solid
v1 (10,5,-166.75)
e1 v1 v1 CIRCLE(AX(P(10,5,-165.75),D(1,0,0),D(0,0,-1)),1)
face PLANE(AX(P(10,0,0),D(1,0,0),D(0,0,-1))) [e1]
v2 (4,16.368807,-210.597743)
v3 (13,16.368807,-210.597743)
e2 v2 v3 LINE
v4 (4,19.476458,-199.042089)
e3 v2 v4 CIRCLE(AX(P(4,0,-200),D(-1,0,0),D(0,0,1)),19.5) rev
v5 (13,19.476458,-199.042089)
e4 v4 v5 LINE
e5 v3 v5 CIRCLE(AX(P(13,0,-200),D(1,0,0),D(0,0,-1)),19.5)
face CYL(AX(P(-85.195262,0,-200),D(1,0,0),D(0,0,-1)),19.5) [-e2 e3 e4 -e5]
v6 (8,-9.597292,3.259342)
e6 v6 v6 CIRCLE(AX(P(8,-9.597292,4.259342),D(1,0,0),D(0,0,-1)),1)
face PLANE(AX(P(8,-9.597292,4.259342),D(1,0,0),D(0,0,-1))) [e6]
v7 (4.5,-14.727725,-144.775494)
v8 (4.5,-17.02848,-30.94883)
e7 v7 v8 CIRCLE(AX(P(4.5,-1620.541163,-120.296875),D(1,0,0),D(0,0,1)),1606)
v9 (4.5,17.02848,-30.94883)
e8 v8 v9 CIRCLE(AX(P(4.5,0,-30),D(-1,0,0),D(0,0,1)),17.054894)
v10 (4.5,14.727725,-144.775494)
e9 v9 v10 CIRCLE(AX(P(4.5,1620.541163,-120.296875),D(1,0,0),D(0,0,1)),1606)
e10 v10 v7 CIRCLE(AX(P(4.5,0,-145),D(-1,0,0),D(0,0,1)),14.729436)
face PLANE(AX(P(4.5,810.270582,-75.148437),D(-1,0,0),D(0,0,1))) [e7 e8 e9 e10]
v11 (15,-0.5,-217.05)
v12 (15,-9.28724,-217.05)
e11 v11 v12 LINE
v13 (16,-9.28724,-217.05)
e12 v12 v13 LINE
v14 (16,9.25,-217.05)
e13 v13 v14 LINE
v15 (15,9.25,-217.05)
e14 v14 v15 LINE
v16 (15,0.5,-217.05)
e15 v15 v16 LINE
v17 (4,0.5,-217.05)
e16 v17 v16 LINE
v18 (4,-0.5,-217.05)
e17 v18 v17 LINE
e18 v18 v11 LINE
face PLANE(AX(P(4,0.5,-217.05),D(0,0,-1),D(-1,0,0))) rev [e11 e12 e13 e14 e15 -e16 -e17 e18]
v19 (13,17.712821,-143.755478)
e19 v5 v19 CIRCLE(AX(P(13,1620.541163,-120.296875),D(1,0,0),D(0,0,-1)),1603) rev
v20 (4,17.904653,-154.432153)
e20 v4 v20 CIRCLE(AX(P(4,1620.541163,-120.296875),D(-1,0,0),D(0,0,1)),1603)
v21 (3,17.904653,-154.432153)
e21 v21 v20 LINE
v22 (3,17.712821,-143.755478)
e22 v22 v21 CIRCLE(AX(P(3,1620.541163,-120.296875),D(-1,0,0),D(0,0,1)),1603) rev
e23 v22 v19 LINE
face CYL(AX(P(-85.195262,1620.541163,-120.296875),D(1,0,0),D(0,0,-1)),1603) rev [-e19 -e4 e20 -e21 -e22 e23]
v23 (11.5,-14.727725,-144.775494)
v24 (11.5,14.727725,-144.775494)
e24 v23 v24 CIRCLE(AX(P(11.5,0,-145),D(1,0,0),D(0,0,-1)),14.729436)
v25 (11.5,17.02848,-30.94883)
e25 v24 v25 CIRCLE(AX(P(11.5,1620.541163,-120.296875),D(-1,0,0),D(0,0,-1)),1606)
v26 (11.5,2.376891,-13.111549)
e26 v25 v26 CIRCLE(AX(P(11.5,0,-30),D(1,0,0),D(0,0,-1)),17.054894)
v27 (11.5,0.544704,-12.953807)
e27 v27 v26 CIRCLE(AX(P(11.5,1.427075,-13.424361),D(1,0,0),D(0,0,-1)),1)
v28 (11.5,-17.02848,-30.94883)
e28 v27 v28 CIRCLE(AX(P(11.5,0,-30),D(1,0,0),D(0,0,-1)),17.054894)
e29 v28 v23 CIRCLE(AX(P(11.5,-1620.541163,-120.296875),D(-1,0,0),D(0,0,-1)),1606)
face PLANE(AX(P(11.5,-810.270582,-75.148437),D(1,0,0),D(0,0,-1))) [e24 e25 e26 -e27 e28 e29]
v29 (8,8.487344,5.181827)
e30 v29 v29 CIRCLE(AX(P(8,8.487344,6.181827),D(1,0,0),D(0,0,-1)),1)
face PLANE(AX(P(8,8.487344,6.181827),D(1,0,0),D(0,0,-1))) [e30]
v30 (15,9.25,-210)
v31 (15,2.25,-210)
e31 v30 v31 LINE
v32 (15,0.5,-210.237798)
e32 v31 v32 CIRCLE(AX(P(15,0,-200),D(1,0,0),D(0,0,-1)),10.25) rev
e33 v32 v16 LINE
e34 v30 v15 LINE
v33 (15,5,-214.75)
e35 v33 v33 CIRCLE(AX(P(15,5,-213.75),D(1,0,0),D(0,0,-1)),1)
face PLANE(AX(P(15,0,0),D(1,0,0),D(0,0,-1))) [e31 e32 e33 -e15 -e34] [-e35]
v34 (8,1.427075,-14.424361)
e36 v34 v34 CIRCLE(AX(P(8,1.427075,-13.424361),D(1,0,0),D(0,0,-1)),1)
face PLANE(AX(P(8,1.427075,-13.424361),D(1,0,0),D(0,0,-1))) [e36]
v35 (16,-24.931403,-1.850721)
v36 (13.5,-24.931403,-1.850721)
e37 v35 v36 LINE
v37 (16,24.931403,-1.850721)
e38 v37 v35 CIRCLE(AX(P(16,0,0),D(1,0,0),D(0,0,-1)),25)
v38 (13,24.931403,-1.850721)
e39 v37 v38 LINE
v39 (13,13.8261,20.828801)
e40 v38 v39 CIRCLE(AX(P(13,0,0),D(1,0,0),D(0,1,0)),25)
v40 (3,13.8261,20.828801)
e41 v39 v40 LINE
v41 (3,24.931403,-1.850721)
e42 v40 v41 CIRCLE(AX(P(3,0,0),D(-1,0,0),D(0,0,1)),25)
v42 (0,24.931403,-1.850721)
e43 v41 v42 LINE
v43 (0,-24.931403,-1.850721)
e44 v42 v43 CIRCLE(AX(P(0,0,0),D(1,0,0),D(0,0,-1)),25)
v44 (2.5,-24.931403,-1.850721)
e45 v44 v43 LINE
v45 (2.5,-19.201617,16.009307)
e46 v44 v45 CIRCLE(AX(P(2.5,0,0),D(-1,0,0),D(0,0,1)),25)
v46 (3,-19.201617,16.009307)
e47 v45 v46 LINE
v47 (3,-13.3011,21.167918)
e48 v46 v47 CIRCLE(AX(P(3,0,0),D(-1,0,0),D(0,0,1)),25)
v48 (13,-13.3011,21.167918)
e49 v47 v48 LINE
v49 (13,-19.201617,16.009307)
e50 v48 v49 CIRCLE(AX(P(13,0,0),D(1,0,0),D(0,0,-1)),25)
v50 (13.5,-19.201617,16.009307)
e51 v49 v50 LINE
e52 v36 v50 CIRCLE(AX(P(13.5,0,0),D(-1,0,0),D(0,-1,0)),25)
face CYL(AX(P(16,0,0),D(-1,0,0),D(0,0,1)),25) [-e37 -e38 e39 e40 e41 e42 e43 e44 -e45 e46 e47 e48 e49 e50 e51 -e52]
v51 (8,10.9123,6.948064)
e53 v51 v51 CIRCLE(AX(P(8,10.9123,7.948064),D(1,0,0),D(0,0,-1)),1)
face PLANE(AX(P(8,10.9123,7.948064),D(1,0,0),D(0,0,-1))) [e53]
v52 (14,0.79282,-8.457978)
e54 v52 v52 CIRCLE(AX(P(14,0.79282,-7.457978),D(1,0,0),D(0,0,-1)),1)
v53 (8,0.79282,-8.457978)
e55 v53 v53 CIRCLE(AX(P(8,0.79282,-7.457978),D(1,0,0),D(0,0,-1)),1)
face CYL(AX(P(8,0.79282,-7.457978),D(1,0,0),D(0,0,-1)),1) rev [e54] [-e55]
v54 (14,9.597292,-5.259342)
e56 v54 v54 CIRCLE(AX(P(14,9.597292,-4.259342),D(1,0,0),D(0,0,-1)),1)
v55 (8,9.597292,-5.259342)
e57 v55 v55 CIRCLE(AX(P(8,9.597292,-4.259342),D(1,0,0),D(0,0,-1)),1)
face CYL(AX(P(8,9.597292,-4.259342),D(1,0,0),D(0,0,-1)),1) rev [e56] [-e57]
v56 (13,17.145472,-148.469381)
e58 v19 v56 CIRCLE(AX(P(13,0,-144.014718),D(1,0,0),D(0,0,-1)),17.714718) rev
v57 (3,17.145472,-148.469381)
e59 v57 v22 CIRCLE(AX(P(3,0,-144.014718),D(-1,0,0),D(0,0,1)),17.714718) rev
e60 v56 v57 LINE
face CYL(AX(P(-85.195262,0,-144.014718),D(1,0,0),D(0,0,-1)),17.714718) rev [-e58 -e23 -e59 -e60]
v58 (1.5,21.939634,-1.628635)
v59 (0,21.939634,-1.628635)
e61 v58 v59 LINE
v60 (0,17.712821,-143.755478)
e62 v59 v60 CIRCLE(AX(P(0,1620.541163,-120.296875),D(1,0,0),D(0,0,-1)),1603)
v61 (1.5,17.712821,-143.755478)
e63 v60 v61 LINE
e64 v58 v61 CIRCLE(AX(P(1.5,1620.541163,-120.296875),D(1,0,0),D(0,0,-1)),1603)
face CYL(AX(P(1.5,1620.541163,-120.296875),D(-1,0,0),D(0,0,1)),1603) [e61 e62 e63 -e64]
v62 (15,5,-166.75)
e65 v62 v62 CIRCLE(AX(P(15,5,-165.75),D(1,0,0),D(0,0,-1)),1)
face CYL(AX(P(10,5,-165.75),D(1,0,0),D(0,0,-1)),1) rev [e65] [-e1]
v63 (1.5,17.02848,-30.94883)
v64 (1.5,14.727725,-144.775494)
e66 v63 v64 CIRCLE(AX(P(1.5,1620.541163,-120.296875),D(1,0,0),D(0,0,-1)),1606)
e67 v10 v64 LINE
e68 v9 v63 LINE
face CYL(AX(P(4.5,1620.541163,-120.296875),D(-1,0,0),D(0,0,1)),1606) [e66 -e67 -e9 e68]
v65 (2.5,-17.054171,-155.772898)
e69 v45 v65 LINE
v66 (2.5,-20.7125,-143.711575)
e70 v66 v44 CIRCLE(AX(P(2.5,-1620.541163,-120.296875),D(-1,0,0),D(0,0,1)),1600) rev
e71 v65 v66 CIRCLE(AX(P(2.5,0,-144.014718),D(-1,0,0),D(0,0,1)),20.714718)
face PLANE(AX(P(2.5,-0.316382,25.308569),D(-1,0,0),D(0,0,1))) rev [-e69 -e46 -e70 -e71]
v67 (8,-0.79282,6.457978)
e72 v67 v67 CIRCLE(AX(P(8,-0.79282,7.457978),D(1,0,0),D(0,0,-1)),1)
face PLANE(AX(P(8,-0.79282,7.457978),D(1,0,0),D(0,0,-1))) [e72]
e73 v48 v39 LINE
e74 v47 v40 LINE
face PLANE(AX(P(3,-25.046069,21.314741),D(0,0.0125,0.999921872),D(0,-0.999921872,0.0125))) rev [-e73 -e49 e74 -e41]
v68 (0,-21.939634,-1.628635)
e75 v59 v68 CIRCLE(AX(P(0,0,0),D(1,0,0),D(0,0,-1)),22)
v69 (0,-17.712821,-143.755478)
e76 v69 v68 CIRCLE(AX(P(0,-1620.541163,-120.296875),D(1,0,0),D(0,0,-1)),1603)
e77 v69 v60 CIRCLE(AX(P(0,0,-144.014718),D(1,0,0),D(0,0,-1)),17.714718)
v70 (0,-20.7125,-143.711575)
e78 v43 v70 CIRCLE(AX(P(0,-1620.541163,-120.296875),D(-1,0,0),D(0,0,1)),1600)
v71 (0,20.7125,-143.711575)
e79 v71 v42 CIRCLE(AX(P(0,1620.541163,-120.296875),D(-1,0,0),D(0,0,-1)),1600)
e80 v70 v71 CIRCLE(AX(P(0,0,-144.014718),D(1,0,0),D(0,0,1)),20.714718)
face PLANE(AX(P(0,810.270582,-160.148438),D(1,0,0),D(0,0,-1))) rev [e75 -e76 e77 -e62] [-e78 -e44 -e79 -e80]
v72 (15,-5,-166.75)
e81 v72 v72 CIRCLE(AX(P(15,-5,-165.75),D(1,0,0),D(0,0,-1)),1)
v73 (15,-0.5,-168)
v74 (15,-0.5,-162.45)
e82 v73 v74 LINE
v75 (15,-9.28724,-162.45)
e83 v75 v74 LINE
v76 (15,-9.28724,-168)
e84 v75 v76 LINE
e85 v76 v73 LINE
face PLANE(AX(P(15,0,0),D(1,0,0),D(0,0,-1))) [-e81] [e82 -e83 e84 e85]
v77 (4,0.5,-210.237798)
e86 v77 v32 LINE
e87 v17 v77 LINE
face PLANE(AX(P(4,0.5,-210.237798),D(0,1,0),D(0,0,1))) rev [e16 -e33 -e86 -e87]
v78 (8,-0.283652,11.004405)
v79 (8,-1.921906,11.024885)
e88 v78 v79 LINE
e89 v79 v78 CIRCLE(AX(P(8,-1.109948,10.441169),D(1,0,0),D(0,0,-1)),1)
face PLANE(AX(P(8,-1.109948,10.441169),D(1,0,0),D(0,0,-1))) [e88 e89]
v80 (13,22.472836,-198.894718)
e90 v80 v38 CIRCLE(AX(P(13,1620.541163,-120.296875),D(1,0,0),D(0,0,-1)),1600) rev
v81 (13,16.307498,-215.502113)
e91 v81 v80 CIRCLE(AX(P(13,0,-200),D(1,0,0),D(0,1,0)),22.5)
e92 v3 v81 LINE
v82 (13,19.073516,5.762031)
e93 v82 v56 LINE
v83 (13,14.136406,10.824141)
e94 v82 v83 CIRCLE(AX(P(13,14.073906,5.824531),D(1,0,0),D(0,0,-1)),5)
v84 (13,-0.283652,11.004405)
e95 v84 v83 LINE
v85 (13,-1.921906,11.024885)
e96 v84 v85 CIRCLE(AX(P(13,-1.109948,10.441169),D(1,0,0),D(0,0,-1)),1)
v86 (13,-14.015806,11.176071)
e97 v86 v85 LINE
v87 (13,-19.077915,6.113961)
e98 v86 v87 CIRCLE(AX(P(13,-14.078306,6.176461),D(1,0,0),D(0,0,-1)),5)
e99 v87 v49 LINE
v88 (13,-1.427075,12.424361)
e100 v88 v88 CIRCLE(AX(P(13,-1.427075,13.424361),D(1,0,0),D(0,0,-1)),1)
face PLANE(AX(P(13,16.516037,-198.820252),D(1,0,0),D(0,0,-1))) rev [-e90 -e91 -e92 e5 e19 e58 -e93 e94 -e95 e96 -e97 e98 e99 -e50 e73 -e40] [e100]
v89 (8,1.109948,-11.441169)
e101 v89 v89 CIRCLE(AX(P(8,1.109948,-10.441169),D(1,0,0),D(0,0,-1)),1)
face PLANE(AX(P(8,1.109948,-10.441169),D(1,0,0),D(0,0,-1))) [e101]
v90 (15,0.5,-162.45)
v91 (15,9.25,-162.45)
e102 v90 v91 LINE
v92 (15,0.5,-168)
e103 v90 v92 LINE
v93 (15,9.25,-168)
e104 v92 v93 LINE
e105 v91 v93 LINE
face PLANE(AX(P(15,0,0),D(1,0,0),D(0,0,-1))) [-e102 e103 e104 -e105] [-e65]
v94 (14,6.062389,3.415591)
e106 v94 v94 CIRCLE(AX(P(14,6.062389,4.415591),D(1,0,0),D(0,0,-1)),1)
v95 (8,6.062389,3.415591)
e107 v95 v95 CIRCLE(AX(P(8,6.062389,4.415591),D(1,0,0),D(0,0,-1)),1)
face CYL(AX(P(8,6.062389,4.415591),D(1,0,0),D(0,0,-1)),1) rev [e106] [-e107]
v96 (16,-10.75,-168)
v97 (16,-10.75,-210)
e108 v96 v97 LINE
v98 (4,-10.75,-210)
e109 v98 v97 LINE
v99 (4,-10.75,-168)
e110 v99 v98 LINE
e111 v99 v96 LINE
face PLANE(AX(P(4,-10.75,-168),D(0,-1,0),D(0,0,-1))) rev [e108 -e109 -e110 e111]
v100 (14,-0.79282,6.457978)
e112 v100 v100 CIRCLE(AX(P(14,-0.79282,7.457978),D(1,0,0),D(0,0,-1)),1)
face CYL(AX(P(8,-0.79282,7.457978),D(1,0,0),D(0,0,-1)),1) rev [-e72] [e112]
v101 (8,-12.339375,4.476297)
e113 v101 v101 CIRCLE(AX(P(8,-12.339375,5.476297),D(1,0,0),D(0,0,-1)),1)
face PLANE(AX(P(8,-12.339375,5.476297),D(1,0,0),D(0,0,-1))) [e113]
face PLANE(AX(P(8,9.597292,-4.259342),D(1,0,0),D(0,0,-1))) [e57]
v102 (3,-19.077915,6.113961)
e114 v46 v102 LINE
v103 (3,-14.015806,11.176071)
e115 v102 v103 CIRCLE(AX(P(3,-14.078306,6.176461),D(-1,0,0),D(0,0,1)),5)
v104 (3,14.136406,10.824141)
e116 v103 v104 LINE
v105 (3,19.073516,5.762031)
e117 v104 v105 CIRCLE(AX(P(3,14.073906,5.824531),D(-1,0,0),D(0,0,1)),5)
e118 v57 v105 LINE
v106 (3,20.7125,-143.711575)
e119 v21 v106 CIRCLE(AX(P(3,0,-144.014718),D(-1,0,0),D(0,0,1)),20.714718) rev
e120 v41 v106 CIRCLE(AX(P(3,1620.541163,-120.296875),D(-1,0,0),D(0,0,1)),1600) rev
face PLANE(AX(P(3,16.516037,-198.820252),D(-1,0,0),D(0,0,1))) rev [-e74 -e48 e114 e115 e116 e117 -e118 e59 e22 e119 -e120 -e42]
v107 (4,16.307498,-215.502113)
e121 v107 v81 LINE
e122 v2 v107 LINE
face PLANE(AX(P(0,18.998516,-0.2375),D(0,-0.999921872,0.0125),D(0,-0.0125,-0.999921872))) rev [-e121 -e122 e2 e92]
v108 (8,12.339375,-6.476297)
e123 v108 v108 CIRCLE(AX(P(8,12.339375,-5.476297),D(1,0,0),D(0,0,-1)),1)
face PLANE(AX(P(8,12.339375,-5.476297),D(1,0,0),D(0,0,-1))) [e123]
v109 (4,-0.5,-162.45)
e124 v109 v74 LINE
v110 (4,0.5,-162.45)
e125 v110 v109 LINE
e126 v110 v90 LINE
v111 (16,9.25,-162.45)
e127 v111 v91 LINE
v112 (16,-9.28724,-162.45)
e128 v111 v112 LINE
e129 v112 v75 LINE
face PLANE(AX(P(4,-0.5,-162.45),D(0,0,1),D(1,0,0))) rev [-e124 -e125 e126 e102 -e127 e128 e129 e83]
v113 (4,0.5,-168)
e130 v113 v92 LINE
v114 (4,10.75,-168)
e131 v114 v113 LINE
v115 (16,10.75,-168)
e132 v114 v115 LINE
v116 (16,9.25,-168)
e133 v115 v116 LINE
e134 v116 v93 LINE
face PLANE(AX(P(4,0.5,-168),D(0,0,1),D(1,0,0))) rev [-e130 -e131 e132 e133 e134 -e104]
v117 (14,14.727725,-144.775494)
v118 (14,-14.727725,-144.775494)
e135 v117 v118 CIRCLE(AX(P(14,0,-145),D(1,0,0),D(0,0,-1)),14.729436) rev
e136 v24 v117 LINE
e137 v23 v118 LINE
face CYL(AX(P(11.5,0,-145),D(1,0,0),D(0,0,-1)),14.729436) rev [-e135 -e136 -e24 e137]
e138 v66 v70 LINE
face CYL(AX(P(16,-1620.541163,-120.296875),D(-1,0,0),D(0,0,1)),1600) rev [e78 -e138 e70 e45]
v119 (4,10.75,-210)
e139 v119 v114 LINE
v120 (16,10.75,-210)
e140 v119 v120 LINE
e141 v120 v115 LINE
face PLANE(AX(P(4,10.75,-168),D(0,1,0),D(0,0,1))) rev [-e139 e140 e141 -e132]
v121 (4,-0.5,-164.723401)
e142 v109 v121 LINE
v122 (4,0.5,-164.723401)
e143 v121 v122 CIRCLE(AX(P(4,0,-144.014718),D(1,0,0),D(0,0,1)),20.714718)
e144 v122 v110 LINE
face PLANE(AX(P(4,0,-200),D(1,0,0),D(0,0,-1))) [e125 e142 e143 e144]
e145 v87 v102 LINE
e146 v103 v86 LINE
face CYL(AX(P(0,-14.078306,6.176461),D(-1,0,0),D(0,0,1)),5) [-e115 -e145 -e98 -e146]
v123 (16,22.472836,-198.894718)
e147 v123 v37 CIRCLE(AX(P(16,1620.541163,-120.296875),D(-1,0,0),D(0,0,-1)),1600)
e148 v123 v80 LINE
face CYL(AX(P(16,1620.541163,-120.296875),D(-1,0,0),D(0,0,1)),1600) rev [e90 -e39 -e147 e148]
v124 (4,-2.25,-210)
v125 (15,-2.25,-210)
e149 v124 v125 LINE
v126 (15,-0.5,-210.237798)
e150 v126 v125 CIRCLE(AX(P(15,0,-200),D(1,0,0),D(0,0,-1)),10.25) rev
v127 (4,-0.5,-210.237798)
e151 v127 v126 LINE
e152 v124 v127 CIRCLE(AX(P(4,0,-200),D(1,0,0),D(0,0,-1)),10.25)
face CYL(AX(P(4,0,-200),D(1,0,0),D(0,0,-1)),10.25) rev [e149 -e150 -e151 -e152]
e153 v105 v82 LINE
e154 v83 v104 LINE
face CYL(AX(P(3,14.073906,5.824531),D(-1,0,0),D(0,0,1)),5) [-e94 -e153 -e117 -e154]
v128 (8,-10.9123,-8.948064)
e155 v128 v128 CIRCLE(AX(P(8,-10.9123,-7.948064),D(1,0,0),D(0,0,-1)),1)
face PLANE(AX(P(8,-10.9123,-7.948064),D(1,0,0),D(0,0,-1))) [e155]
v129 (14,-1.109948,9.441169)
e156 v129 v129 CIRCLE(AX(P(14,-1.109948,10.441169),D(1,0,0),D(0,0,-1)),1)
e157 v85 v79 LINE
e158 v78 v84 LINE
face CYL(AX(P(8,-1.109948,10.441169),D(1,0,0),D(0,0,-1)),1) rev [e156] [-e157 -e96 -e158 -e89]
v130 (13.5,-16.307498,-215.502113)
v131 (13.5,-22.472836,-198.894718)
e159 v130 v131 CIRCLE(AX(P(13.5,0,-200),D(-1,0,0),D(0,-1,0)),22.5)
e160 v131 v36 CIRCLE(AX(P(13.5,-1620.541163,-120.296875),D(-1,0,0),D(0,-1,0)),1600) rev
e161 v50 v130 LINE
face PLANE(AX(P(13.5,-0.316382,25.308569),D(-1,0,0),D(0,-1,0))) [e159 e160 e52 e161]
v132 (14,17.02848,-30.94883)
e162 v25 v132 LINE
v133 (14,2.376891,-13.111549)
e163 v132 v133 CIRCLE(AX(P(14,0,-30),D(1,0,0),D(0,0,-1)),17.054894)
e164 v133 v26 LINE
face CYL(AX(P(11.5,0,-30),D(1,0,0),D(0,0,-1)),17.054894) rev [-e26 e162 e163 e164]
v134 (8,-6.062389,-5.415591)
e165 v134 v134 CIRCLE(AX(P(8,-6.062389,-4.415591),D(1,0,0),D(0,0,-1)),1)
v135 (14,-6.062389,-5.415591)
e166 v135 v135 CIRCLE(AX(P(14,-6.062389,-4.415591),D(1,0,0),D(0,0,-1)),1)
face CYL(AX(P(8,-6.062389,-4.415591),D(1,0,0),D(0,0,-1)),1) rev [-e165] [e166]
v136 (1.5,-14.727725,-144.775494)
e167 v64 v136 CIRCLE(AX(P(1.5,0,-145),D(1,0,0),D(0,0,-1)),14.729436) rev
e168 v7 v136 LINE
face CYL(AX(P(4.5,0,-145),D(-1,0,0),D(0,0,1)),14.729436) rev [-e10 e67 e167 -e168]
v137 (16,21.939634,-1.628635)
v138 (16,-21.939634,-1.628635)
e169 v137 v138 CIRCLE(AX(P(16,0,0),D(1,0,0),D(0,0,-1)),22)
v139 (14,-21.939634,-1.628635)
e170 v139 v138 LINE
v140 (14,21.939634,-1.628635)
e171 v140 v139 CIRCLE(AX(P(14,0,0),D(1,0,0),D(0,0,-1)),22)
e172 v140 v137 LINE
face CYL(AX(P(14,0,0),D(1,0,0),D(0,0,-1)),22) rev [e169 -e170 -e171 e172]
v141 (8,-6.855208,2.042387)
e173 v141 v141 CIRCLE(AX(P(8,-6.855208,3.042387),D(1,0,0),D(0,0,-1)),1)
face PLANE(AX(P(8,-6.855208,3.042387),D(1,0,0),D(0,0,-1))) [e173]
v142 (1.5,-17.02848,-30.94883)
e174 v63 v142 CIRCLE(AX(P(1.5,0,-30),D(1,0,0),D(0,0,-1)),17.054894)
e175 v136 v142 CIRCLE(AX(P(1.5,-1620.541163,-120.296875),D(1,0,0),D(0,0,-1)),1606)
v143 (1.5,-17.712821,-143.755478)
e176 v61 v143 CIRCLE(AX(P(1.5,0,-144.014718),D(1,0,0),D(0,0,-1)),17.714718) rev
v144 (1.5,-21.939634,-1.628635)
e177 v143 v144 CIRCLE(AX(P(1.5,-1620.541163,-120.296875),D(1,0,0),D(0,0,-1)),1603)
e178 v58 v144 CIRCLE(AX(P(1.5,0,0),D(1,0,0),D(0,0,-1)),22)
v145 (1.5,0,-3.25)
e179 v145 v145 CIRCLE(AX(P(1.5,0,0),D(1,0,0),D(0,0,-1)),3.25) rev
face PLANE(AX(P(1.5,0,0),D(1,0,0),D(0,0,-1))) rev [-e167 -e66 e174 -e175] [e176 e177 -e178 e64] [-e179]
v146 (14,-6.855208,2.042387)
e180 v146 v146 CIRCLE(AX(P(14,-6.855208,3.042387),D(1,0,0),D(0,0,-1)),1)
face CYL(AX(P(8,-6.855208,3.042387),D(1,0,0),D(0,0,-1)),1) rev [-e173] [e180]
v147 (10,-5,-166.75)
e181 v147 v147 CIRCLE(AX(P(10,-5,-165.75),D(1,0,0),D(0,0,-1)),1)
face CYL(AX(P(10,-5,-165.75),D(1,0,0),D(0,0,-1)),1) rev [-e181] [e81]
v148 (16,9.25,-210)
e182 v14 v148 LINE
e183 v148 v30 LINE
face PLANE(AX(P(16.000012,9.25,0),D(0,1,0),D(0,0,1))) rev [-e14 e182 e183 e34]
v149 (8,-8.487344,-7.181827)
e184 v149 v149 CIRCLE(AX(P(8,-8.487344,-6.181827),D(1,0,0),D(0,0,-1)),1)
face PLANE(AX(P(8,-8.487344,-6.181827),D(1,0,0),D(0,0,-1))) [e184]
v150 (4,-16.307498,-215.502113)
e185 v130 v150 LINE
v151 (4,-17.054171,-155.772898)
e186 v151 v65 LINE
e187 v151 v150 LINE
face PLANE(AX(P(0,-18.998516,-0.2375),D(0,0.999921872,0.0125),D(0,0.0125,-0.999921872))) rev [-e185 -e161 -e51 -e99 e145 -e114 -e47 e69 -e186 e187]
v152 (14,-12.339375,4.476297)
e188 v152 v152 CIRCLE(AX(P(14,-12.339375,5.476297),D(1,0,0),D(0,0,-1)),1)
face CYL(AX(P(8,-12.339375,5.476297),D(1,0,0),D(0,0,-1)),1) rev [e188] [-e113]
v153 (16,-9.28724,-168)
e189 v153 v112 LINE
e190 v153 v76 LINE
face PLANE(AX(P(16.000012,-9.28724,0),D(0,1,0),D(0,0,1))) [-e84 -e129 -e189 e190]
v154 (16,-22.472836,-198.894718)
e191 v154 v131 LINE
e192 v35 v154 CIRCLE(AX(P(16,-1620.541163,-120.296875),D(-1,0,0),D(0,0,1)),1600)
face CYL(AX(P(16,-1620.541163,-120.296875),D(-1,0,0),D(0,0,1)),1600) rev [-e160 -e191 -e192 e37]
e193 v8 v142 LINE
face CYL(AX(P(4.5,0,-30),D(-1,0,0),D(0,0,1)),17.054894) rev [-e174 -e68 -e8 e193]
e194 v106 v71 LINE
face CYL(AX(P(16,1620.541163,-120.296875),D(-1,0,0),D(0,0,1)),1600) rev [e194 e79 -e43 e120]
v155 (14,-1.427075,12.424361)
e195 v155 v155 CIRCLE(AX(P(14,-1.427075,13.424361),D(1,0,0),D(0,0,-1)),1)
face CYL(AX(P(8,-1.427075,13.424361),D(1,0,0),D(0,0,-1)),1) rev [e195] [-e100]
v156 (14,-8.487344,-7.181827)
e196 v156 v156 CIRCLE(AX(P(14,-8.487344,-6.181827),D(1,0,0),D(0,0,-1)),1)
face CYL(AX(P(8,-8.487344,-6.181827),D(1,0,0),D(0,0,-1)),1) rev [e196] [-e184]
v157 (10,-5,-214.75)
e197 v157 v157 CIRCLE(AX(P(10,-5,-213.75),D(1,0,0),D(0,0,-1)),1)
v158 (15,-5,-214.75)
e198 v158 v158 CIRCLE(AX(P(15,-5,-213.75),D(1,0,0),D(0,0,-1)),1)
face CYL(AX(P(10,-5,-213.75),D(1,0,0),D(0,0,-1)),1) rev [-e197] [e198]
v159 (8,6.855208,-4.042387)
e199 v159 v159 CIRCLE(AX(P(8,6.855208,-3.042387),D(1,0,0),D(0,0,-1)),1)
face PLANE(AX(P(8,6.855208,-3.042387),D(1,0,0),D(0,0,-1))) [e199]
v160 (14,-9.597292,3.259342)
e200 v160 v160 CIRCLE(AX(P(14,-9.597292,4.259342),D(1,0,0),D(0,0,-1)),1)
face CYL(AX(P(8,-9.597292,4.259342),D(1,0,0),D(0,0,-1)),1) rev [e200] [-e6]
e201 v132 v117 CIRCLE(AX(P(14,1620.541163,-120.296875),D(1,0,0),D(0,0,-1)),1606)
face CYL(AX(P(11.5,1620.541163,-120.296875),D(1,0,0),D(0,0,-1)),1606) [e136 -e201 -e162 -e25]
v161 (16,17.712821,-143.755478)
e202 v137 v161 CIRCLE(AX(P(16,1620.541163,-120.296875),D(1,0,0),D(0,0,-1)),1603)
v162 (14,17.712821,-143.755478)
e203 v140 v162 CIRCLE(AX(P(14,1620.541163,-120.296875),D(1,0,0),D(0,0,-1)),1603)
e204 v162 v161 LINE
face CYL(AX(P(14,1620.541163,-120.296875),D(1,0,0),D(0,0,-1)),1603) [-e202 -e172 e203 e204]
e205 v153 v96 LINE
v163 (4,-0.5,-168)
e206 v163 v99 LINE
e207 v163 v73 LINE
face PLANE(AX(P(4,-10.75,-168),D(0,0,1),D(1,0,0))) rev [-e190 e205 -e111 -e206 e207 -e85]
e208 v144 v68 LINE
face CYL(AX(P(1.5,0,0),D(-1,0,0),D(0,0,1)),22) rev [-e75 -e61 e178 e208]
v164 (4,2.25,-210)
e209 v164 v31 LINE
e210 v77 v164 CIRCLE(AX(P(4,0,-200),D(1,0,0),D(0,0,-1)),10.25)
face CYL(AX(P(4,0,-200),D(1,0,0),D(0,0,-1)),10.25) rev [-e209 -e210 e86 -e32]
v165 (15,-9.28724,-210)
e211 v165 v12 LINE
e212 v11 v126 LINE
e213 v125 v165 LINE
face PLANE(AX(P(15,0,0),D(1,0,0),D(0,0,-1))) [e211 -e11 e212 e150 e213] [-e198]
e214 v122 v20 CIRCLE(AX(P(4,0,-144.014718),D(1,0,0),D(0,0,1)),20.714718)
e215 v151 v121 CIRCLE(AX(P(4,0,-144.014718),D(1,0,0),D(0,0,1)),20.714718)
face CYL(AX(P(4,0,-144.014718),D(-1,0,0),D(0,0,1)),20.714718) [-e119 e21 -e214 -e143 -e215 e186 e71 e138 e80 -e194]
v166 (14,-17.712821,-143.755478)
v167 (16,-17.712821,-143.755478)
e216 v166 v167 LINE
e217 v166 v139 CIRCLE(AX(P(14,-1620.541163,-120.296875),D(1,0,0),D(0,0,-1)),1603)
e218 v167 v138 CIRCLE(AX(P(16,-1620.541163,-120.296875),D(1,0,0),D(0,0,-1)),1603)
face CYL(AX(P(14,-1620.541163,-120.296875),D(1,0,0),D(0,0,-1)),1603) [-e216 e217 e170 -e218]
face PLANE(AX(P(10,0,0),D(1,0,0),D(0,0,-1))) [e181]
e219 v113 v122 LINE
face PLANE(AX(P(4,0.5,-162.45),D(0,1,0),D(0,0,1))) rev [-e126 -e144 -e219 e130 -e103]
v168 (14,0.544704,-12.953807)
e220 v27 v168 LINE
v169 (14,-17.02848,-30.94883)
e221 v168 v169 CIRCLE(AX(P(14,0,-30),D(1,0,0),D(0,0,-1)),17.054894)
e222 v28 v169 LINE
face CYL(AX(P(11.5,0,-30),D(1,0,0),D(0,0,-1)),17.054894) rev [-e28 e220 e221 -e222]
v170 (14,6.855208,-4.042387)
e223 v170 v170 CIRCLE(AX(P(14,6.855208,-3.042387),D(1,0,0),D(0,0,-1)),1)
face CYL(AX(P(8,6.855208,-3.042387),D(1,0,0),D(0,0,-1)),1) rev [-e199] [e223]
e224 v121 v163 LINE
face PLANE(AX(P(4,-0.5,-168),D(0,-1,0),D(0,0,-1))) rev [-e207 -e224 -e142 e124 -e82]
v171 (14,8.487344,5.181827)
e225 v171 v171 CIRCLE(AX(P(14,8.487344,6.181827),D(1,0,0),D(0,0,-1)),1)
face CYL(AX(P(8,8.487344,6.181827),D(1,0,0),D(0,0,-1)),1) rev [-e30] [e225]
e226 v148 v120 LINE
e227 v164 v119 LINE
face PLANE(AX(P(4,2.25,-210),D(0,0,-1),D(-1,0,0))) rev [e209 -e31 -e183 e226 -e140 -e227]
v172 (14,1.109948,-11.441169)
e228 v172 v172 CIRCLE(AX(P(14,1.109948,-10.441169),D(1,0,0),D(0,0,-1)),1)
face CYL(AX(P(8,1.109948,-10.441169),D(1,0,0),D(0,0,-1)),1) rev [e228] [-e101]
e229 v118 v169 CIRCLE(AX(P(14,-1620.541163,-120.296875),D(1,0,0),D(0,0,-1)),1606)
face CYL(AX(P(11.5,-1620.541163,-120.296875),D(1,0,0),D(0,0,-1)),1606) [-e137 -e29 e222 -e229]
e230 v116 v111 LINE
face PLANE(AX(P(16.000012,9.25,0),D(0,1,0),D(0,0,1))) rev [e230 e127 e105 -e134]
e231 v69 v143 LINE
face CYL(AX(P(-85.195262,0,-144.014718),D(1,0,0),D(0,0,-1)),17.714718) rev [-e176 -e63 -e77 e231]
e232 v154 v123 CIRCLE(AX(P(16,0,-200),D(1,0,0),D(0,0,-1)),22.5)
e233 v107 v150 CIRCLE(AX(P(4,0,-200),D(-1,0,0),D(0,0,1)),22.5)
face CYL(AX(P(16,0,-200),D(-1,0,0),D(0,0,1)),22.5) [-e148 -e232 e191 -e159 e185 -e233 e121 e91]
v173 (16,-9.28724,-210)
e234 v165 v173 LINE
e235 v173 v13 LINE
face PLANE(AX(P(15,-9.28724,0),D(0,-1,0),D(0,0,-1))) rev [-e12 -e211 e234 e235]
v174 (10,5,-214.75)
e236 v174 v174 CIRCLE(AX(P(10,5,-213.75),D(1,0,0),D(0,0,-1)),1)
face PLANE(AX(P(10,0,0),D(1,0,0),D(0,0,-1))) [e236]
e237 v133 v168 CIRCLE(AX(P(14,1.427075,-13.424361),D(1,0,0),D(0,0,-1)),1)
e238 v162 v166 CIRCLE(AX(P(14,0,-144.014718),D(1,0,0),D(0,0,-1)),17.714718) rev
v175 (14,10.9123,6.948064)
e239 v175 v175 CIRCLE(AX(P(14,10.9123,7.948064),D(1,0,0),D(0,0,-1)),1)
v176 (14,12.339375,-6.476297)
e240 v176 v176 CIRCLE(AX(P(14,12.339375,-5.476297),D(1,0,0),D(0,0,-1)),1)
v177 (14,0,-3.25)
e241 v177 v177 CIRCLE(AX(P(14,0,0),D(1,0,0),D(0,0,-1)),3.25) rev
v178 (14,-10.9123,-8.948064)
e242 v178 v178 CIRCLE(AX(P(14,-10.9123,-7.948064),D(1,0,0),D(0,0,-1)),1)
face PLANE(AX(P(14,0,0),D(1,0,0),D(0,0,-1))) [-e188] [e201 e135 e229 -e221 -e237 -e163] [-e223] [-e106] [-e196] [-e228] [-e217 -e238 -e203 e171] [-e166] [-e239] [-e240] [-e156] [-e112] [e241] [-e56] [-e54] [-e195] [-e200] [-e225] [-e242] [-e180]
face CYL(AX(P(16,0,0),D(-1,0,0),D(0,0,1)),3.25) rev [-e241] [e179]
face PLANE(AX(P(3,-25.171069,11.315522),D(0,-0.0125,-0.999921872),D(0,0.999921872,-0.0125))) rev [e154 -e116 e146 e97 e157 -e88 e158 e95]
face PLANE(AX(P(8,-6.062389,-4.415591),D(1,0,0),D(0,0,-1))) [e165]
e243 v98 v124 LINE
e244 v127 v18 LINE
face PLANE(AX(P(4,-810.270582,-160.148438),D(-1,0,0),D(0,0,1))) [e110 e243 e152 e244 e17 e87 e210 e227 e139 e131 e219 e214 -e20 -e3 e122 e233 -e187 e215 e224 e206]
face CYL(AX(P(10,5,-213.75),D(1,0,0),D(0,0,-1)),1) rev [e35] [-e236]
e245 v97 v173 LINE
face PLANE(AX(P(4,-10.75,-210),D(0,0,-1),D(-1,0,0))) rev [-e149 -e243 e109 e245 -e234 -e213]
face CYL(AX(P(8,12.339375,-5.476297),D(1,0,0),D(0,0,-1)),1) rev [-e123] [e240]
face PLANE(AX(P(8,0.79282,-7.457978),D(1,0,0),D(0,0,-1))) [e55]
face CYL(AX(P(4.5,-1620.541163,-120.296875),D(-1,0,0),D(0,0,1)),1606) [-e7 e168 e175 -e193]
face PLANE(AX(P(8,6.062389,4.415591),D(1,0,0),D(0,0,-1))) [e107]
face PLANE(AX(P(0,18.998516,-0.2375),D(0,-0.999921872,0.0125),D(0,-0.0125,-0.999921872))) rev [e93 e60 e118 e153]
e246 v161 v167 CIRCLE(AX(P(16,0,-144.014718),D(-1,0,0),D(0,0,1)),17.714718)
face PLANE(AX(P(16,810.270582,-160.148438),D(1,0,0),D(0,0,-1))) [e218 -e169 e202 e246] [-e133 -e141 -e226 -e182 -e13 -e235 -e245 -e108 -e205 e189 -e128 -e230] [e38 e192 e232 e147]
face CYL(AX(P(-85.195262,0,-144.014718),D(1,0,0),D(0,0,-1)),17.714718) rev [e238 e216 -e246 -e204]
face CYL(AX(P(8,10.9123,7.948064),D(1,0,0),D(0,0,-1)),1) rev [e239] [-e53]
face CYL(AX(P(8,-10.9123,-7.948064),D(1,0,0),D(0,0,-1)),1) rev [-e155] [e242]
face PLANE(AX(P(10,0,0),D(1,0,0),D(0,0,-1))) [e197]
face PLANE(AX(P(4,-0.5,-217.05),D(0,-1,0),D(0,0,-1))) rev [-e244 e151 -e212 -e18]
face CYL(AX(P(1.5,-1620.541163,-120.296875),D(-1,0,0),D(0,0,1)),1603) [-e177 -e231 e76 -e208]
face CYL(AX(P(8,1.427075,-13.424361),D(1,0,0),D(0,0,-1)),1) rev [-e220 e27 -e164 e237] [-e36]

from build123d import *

# Parameters (mm, degrees)
SKETCH1_R                = 3.25
BOSS_EXTRUDE1_DEPTH      = 16
CUT_EXTRUDE1_START       = -2
SKETCH3_R                = 3.25
CUT_EXTRUDE1_DEPTH       = 2
CUT_EXTRUDE3_START       = -16
CUT_EXTRUDE3_DEPTH       = 1.5
SKETCH15_W               = 10
SKETCH15_H               = 197.059334101
CUT_EXTRUDE9_DEPTH       = 6
CUT_EXTRUDE10_DEPTH      = 226.832977272
CUT_EXTRUDE10_DEPTH_BACK = 226.832977272
SKETCH17_W               = 10
SKETCH17_H               = 10
CUT_EXTRUDE11_DEPTH      = 228.139798975
FILLET8_R                = 5
BOSS_EXTRUDE2_REACH      = 226.471
CUT_EXTRUDE13_DEPTH      = 12
CUT_EXTRUDE15_DEPTH      = 4.5
CUT_EXTRUDE16_START      = -4.5
CUT_EXTRUDE16_DEPTH      = 4.5
SKETCH26_R               = 1
CUT_EXTRUDE17_DEPTH      = 6
CUT_EXTRUDE18_DEPTH      = 225.471044903
CUT_EXTRUDE18_DEPTH_BACK = 1
SKETCH26_3_W             = 54.6
SKETCH26_3_H             = 18.537240037
CUT_EXTRUDE19_DEPTH      = 4
CUT_EXTRUDE20_DEPTH      = 223.947993965
CUT_EXTRUDE20_DEPTH_BACK = 223.947993965
SKETCH29_W               = 5
SKETCH29_H               = 5.952588684
FILLET9_R                = 5
SKETCH32_R               = 1
CUT_EXTRUDE21_DEPTH      = 6


with BuildPart() as part:
    # Sketch1 → Boss-Extrude1 (new body)
    with BuildSketch(Plane(origin=(0, 0, 0), x_dir=(0, 0, -1), z_dir=(1, 0, 0))):
        with BuildLine():
            ThreePointArc((1.850721154, 24.931402512), (-25, 0), (1.850721154, -24.931402512))
            ThreePointArc((1.850721154, -24.931402512), (100.334833268, -20.665694092), (198.894717835, -22.472835854))
            ThreePointArc((198.894717835, -22.472835854), (222.5, 0), (198.894717835, 22.472835854))
            ThreePointArc((198.894717835, 22.472835854), (100.334833268, 20.665694092), (1.850721154, 24.931402512))
        make_face()
        Circle(SKETCH1_R, mode=Mode.SUBTRACT)
        with Locations(Location((200, 0, 0), (0, 0, 180))):
            Circle(SKETCH1_R, mode=Mode.SUBTRACT)
    extrude(amount=BOSS_EXTRUDE1_DEPTH)

    # Sketch3 → Cut-Extrude1 (cut)
    with BuildSketch(Plane(origin=(16, 0, 0), x_dir=(0, 0, -1), z_dir=(1, 0, 0)).offset(CUT_EXTRUDE1_START)):
        with BuildLine():
            ThreePointArc((1.628634615, -21.93963421), (100.29740444, -17.665927587), (199.04208879, -19.47645774))
            ThreePointArc((199.04208879, -19.47645774), (219.5, 0), (199.04208879, 19.47645774))
            ThreePointArc((199.04208879, 19.47645774), (100.29740444, 17.665927587), (1.628634615, 21.93963421))
            ThreePointArc((1.628634615, 21.93963421), (-22, 0), (1.628634615, -21.93963421))
        make_face()
        Circle(SKETCH3_R, mode=Mode.SUBTRACT)
        with BuildLine():
            ThreePointArc((30.948830257, -17.028479538), (12.945106443, 0), (30.948830257, 17.028479538))
            ThreePointArc((30.948830257, 17.028479538), (87.841768176, 14.86913386), (144.77549423, 14.727725417))
            ThreePointArc((144.77549423, 14.727725417), (159.729436473, 0), (144.77549423, -14.727725417))
            ThreePointArc((144.77549423, -14.727725417), (87.841768176, -14.86913386), (30.948830257, -17.028479538))
        make_face(mode=Mode.SUBTRACT)
        with Locations(Location((200, 0, 0), (0, 0, 180))):
            Circle(SKETCH3_R, mode=Mode.SUBTRACT)
    extrude(amount=CUT_EXTRUDE1_DEPTH, mode=Mode.SUBTRACT)

    # Sketch3<2> → Cut-Extrude3 (cut)
    with BuildSketch(Plane(origin=(16, 0, 0), x_dir=(0, 0, -1), z_dir=(1, 0, 0)).offset(CUT_EXTRUDE3_START)):
        with BuildLine():
            ThreePointArc((1.628634615, -21.93963421), (100.29740444, -17.665927587), (199.04208879, -19.47645774))
            ThreePointArc((199.04208879, -19.47645774), (219.5, 0), (199.04208879, 19.47645774))
            ThreePointArc((199.04208879, 19.47645774), (100.29740444, 17.665927587), (1.628634615, 21.93963421))
            ThreePointArc((1.628634615, 21.93963421), (-22, 0), (1.628634615, -21.93963421))
        make_face()
        with BuildLine():
            ThreePointArc((30.948830257, -17.028479538), (12.945106443, 0), (30.948830257, 17.028479538))
            ThreePointArc((30.948830257, 17.028479538), (87.841768176, 14.86913386), (144.77549423, 14.727725417))
            ThreePointArc((144.77549423, 14.727725417), (159.729436473, 0), (144.77549423, -14.727725417))
            ThreePointArc((144.77549423, -14.727725417), (87.841768176, -14.86913386), (30.948830257, -17.028479538))
        make_face(mode=Mode.SUBTRACT)
    extrude(amount=CUT_EXTRUDE3_DEPTH, mode=Mode.SUBTRACT)

    # Sketch15 → Cut-Extrude9 (cut)
    with BuildSketch(Plane(origin=(0, 24.998046799, -0.3125), x_dir=(1, 0, 0), z_dir=(0, 0.9999218719480037, -0.012500000000000532))):
        with Locations((8, 100.068601079)):
            Rectangle(SKETCH15_W, SKETCH15_H)
    cut_extrude9 = extrude(amount=-CUT_EXTRUDE9_DEPTH, mode=Mode.SUBTRACT)

    # Sketch16 → Cut-Extrude10 (cut, two sides: drawn at the far end of the back side and taken through both)
    with BuildSketch(Plane(origin=(0, -2.482478352, -198.582752034), x_dir=(1, 0, 0), z_dir=(0, 0.012500000000000532, 0.9999218719480037)).offset(-CUT_EXTRUDE10_DEPTH_BACK)):
        Polygon((3, 24.957264068), (3, 27.091896258), (13, 27.091896258), (13, 24.957264068), (13, 19), (3, 19), align=None)
    extrude(amount=CUT_EXTRUDE10_DEPTH + CUT_EXTRUDE10_DEPTH_BACK, mode=Mode.SUBTRACT)

    # Sketch17 → Cut-Extrude11 (cut, through all)
    with BuildSketch(Plane(origin=(0, 18.998515567, -0.2375), x_dir=(1, 0, 0), z_dir=(0, 0.9999218719480037, -0.012500000000000535))):
        with Locations((8, -16)):
            Rectangle(SKETCH17_W, SKETCH17_H)
    extrude(amount=-CUT_EXTRUDE11_DEPTH, mode=Mode.SUBTRACT)

    # Fillet8
    fillet8_edges = [part.edges().sort_by_distance(p)[0] for p in [
        (8, 19.136015567, 10.761640591),
        (8, -22.31069035, 11.279764895),
    ]]
    fillet(fillet8_edges, radius=FILLET8_R)

    # Boss-Extrude2: up to this face of the body (flat: up to its plane)
    boss_extrude2_end = Plane(part.part.faces().sort_by_distance((0, 0, -84.468195017))[0])
    # Sketch18 → Boss-Extrude2 (add, up to the picked face)
    with BuildSketch(Plane(origin=(16, 0, 0), x_dir=(0, 0, -1), z_dir=(1, 0, 0)), mode=Mode.PRIVATE) as boss_extrude2_sk1:
        with BuildLine():
            ThreePointArc((143.755477713, 17.712821261), (161.729436473, 0), (143.755477713, -17.712821261))
            ThreePointArc((143.755477713, -17.712821261), (171.406391045, -18.35614981), (199.04208879, -19.47645774))
            ThreePointArc((199.04208879, -19.47645774), (219.5, 0), (199.04208879, 19.47645774))
            ThreePointArc((199.04208879, 19.47645774), (171.406391045, 18.35614981), (143.755477713, 17.712821261))
        make_face()
    boss_extrude2_tool1 = split(extrude(boss_extrude2_sk1.sketch, amount=-BOSS_EXTRUDE2_REACH, mode=Mode.PRIVATE), bisect_by=boss_extrude2_end, keep=Keep.BOTH, mode=Mode.PRIVATE)
    add(boss_extrude2_tool1.solids().sort_by(Axis((16, 0, -187.069219), (-1, 0, 0)))[0])

    # Sketch21 → Cut-Extrude13 (cut)
    with BuildSketch(Plane(origin=(16, 0, 0), x_dir=(0, 0, -1), z_dir=(1, 0, 0))):
        with BuildLine():
            Line((168, -10.75), (210, -10.75))
            Line((210, -10.75), (210, -2.25))
            ThreePointArc((210, -2.25), (210.156659789, -1.380131127), (210.237797615, -0.5))
            Line((210.237797615, -0.5), (210.25, -0.5))
            Line((210.25, -0.5), (217.05, -0.5))
            Line((217.05, -0.5), (217.05, 0.5))
            Line((217.05, 0.5), (210.25, 0.5))
            Line((210.25, 0.5), (210.237797615, 0.5))
            ThreePointArc((210.237797615, 0.5), (210.156659789, 1.380131127), (210, 2.25))
            Line((210, 2.25), (210, 10.75))
            Line((210, 10.75), (168, 10.75))
            Line((168, 10.75), (168, 0.5))
            Line((168, 0.5), (162.45, 0.5))
            Line((162.45, 0.5), (162.45, -0.5))
            Line((162.45, -0.5), (168, -0.5))
            Line((168, -0.5), (168, -10.75))
        make_face()
    extrude(amount=-CUT_EXTRUDE13_DEPTH, mode=Mode.SUBTRACT)

    # Sketch23 → Cut-Extrude15 (cut)
    with BuildSketch(Plane.ZY):
        with BuildLine():
            ThreePointArc((-144.77549423, 14.727725417), (-159.729436473, 0), (-144.77549423, -14.727725417))
            ThreePointArc((-144.77549423, -14.727725417), (-87.841768176, -14.86913386), (-30.948830257, -17.028479538))
            ThreePointArc((-30.948830257, -17.028479538), (-12.945106443, 0), (-30.948830257, 17.028479538))
            ThreePointArc((-30.948830257, 17.028479538), (-87.841768176, 14.86913386), (-144.77549423, 14.727725417))
        make_face()
    extrude(amount=-CUT_EXTRUDE15_DEPTH, mode=Mode.SUBTRACT)

    # Sketch24 → Cut-Extrude16 (cut)
    with BuildSketch(Plane(origin=(16, 0, 0), x_dir=(0, 0, -1), z_dir=(1, 0, 0)).offset(CUT_EXTRUDE16_START)):
        with BuildLine():
            ThreePointArc((144.77549423, -14.727725417), (159.729436473, 0), (144.77549423, 14.727725417))
            ThreePointArc((144.77549423, 14.727725417), (87.841768176, 14.86913386), (30.948830257, 17.028479538))
            ThreePointArc((30.948830257, 17.028479538), (12.945106443, 0), (30.948830257, -17.028479538))
            ThreePointArc((30.948830257, -17.028479538), (87.841768176, -14.86913386), (144.77549423, -14.727725417))
        make_face()
    extrude(amount=CUT_EXTRUDE16_DEPTH, mode=Mode.SUBTRACT)

    # Sketch26 → Cut-Extrude17 (cut)
    with BuildSketch(Plane(origin=(16, 0, 0), x_dir=(0, 0, -1), z_dir=(1, 0, 0))):
        with Locations((213.75, 5)):
            Circle(SKETCH26_R)
        with Locations((213.75, -5)):
            Circle(SKETCH26_R)
        with Locations((165.75, -5)):
            Circle(SKETCH26_R)
        with Locations((165.75, 5)):
            Circle(SKETCH26_R)
    extrude(amount=-CUT_EXTRUDE17_DEPTH, mode=Mode.SUBTRACT)

    # Sketch26<3> → Cut-Extrude18 (cut, two sides: drawn at the far end of the back side and taken through both)
    with BuildSketch(Plane(origin=(16, 0, 0), x_dir=(0, 0, -1), z_dir=(1, 0, 0)).offset(-CUT_EXTRUDE18_DEPTH_BACK)):
        with Locations((189.75, -0.018620019)):
            Rectangle(SKETCH26_3_W, SKETCH26_3_H)
    extrude(amount=CUT_EXTRUDE18_DEPTH + CUT_EXTRUDE18_DEPTH_BACK, mode=Mode.SUBTRACT)

    # Sketch28 → Cut-Extrude19 (cut)
    with BuildSketch(Plane.ZY):
        with BuildLine():
            ThreePointArc((-143.71157515, 20.712500005), (-164.729436473, 0), (-143.71157515, -20.712500005))
            ThreePointArc((-143.71157515, -20.712500005), (-171.310740048, -21.35462457), (-198.894717835, -22.472835854))
            ThreePointArc((-198.894717835, -22.472835854), (-222.5, 0), (-198.894717835, 22.472835854))
            ThreePointArc((-198.894717835, 22.472835854), (-171.310740048, 21.35462457), (-143.71157515, 20.712500005))
        make_face()
    extrude(amount=-CUT_EXTRUDE19_DEPTH, mode=Mode.SUBTRACT)

    # Mirror1: Cut-Extrude9 across plane
    add(cut_extrude9.mirror(Plane.ZX), mode=Mode.SUBTRACT)

    # Sketch29 → Cut-Extrude20 (cut, two sides: drawn at the far end of the back side and taken through both)
    with BuildSketch(Plane(origin=(0, 0.019236675, -1.538813795), x_dir=(-1, 0, 0), z_dir=(0, 0.012500000000001647, -0.9999218719480037)).offset(-CUT_EXTRUDE20_DEPTH_BACK)):
        with Locations((-10.5, -21.976294342)):
            Rectangle(SKETCH29_W, SKETCH29_H)
        with Locations((-5.5, -21.976294342)):
            Rectangle(SKETCH29_W, SKETCH29_H)
        Polygon((-8, -27.230500843), (-8, -24.952588684), (-13, -24.952588684), (-13, -19), (-13.5, -19), (-13.5, -27.230500843), (-13, -27.230500843), align=None)
        Polygon((-2.5, -19), (-3, -19), (-3, -24.952588684), (-8, -24.952588684), (-8, -27.230500843), (-3, -27.230500843), (-2.5, -27.230500843), align=None)
    extrude(amount=CUT_EXTRUDE20_DEPTH + CUT_EXTRUDE20_DEPTH_BACK, mode=Mode.SUBTRACT)

    # Fillet9
    # the kernel refuses this fillet: 5 mm, written as the material it takes off along each edge
    with BuildSketch(Plane(origin=(13, -19.14194634, 11.236065358), x_dir=(0, 0.012500000000001623, -0.9999218719480037), z_dir=(-1, 0, 0))) as fillet9_piece_1:
        with BuildLine():
            CenterArc((5.122504194, -5), FILLET9_R, 90, 91.432431792)
            Line((0.124066694, -5.124990234), (-0.375777056, -5.137489257))
            ThreePointArc((-0.375777056, -5.137489257), (-0.49887675, -0.21465563), (-0.49994045, 0.007716637))
            Line((-0.49994045, 0.007716637), (0, 0.5))
            Line((0, 0.5), (5.122504194, 0.5))
            Line((5.122504194, 0.5), (5.122504194, 0))
        make_face()
    extrude(amount=10, mode=Mode.SUBTRACT)

    # Sketch32 → Cut-Extrude21 (cut)
    with BuildSketch(Plane(origin=(14, 0, 0), x_dir=(0, 0, -1), z_dir=(1, 0, 0))):
        with Locations((3.042387058, 6.855208311)):
            Circle(SKETCH32_R)
        with Locations((4.259341881, 9.597291636)):
            Circle(SKETCH32_R)
        with Locations((5.476296704, 12.33937496)):
            Circle(SKETCH32_R)
        with Locations((13.424360534, 1.427075416)):
            Circle(SKETCH32_R)
        with Locations((10.441169305, 1.109947546)):
            Circle(SKETCH32_R)
        with Locations((7.457978075, 0.792819675)):
            Circle(SKETCH32_R)
        with Locations((7.94806383, -10.912299544)):
            Circle(SKETCH32_R)
        with Locations((6.181827424, -8.48734409)):
            Circle(SKETCH32_R)
        with Locations((4.415591017, -6.062388636)):
            Circle(SKETCH32_R)
        with Locations((-5.476296704, -12.33937496)):
            Circle(SKETCH32_R)
        with Locations((-4.259341881, -9.597291636)):
            Circle(SKETCH32_R)
        with Locations((-3.042387058, -6.855208311)):
            Circle(SKETCH32_R)
        with Locations((-13.424360534, -1.427075416)):
            Circle(SKETCH32_R)
        with Locations((-10.441169305, -1.109947546)):
            Circle(SKETCH32_R)
        with Locations((-7.457978075, -0.792819675)):
            Circle(SKETCH32_R)
        with Locations((-7.94806383, 10.912299544)):
            Circle(SKETCH32_R)
        with Locations((-6.181827424, 8.48734409)):
            Circle(SKETCH32_R)
        with Locations((-4.415591017, 6.062388636)):
            Circle(SKETCH32_R)
    extrude(amount=-CUT_EXTRUDE21_DEPTH, mode=Mode.SUBTRACT)


solid = part.part
